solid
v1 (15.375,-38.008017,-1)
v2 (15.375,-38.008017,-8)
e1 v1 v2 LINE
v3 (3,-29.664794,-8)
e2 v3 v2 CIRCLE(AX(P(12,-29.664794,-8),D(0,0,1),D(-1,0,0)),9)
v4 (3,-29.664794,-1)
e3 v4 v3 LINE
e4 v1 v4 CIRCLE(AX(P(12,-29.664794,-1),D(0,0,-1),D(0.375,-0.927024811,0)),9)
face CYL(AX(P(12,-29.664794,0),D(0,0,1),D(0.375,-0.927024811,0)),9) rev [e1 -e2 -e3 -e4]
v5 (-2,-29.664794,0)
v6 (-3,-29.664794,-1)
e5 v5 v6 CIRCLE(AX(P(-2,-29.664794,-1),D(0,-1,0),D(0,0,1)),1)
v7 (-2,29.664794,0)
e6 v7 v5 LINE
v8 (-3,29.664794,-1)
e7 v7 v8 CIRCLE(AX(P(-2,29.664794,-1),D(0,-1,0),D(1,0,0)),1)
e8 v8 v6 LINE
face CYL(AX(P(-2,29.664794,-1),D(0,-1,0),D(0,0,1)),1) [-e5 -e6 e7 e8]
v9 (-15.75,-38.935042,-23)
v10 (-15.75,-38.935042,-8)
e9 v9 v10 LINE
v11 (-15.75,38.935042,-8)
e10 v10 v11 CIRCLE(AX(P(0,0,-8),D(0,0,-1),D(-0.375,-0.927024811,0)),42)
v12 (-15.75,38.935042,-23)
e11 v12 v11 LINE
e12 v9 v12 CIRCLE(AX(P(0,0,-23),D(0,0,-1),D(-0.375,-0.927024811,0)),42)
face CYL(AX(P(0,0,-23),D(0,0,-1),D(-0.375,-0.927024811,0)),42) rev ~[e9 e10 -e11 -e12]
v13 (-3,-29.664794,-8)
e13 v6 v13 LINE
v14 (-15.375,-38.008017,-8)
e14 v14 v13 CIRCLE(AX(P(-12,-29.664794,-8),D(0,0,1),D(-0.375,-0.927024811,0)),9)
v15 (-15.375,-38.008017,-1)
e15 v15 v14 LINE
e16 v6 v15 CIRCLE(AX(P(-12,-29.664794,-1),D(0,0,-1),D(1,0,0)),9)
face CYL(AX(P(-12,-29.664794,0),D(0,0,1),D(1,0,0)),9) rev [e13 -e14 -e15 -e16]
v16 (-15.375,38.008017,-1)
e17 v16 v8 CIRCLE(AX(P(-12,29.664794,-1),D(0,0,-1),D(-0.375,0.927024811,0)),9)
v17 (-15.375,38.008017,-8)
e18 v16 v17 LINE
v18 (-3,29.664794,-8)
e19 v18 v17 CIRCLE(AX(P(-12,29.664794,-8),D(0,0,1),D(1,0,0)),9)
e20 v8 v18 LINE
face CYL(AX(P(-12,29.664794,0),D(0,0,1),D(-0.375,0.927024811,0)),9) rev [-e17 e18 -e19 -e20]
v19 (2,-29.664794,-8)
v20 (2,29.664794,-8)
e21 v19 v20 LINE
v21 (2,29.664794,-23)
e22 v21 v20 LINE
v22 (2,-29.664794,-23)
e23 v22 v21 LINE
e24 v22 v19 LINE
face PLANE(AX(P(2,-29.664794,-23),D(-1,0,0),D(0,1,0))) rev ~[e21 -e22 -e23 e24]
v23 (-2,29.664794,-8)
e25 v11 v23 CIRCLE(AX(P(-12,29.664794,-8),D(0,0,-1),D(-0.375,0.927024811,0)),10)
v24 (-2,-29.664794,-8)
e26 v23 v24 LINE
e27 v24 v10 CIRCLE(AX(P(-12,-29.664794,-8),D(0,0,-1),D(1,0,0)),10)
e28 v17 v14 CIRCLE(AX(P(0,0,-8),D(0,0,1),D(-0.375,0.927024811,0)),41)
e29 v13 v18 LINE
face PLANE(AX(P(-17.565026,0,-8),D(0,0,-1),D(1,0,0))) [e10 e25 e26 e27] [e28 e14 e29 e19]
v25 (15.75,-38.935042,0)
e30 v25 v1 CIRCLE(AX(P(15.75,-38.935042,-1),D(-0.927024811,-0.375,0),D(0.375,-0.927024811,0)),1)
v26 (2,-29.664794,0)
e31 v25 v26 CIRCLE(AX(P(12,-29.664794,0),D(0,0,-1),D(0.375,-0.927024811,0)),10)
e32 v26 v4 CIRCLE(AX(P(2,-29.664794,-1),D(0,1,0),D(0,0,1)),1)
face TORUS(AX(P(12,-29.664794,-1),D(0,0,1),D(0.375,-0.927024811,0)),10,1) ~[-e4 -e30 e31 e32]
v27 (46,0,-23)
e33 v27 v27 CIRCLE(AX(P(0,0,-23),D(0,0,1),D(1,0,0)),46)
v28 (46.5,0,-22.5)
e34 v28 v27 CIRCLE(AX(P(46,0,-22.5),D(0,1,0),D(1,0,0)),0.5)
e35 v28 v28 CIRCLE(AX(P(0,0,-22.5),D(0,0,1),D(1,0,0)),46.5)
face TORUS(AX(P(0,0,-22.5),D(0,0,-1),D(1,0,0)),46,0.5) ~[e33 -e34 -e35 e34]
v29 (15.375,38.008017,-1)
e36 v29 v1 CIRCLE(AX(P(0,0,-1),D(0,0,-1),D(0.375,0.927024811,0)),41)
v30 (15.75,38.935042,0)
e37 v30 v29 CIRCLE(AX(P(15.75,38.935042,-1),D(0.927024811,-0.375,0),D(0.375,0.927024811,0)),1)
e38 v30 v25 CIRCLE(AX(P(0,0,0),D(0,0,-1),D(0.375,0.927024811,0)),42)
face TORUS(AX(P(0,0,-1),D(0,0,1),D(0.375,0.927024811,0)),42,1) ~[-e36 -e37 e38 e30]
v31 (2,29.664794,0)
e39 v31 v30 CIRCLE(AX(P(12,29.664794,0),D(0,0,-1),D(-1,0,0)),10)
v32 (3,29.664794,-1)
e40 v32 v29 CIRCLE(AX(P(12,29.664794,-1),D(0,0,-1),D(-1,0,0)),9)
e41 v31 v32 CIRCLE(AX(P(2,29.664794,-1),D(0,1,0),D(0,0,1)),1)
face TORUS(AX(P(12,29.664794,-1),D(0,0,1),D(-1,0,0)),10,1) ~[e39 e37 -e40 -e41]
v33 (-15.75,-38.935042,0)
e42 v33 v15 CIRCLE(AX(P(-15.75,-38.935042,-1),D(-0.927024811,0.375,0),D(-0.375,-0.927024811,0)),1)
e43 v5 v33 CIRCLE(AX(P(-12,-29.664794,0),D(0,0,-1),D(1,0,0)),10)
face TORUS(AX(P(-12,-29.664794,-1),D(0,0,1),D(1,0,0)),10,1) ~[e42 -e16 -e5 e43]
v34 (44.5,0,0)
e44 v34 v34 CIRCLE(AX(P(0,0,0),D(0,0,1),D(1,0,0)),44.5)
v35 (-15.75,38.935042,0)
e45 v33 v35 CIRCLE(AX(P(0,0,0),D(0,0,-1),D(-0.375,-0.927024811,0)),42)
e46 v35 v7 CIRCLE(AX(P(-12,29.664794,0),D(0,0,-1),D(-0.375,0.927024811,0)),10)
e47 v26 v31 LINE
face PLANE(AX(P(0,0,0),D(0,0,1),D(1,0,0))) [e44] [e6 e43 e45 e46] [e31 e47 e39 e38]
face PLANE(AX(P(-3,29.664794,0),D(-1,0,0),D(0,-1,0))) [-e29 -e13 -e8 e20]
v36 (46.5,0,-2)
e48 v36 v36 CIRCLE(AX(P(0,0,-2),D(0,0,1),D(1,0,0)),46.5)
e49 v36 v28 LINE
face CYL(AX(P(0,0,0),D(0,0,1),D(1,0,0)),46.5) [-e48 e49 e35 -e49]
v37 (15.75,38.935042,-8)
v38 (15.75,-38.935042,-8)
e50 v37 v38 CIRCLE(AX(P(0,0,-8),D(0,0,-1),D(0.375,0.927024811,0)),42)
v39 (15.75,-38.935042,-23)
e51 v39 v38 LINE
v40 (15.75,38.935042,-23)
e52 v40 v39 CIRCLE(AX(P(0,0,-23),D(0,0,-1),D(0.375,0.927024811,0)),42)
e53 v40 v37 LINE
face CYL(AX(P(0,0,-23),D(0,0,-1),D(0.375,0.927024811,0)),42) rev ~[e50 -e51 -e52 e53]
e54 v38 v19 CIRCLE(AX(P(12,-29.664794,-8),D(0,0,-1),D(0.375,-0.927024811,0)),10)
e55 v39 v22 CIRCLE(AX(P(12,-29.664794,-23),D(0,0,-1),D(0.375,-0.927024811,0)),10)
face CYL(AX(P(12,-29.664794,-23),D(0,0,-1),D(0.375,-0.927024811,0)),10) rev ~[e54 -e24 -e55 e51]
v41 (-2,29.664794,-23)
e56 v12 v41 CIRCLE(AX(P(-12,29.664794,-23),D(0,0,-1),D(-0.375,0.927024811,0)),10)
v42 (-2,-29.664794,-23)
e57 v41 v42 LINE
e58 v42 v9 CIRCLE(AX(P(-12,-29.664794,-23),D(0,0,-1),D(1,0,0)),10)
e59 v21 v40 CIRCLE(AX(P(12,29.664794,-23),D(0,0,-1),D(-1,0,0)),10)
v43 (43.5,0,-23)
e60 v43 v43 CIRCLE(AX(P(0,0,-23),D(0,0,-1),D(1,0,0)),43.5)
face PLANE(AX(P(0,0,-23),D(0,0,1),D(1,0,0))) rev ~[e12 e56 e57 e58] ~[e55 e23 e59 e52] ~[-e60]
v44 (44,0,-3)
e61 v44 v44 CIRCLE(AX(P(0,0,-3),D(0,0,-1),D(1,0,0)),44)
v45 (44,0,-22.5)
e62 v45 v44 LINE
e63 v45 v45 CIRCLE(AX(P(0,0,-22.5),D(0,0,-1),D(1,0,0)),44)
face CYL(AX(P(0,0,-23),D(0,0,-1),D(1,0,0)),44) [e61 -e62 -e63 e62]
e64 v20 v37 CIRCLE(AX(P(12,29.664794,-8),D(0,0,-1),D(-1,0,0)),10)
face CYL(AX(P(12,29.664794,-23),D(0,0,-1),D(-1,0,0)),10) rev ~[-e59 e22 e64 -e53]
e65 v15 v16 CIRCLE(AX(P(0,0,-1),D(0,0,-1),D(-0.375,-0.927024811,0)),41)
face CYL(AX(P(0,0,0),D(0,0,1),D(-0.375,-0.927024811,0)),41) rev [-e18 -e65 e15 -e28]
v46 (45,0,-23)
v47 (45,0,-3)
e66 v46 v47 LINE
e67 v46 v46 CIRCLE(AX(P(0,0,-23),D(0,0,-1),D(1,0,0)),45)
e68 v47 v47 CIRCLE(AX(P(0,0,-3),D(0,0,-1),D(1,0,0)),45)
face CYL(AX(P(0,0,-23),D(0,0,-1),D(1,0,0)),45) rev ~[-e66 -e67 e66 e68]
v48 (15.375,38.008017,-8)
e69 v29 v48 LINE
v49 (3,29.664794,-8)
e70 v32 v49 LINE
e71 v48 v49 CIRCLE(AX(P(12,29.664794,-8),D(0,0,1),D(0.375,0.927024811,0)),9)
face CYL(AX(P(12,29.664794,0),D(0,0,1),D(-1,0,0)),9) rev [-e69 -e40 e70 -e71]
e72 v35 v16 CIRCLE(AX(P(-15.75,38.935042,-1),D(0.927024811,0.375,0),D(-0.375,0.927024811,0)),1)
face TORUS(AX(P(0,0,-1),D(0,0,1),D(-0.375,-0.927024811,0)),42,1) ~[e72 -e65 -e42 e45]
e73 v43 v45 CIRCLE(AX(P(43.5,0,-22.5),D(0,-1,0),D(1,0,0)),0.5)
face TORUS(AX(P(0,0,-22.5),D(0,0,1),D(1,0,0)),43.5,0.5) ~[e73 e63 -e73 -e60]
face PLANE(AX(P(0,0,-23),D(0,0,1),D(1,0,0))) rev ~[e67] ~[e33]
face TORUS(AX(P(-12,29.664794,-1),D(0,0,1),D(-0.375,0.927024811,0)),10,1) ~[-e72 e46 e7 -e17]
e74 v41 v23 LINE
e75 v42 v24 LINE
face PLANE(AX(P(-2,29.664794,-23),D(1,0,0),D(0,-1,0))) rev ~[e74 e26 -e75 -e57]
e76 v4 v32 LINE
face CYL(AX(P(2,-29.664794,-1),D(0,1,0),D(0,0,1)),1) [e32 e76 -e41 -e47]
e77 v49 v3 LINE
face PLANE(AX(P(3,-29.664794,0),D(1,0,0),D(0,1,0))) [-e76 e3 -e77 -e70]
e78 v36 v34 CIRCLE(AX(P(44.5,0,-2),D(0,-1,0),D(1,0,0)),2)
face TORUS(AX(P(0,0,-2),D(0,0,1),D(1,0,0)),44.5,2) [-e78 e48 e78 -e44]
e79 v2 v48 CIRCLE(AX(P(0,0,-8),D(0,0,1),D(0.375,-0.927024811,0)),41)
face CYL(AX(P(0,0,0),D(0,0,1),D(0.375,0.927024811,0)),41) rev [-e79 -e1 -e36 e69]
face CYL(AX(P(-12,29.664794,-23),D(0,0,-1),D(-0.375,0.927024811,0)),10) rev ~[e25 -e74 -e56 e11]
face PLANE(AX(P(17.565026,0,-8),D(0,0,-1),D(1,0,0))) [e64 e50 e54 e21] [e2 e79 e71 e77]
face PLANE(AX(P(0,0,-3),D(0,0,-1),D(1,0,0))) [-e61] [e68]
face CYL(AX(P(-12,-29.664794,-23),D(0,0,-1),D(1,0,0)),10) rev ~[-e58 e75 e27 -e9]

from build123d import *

# Parameters (mm, degrees)
F0_R     = 46.5
F1_DEPTH = 23
F3_DEPTH = 15
F4_R     = 1
F5_R     = 45
F5_R_2   = 44
F6_DEPTH = 20
F7_R     = 0.5
F8_R     = 2


# Not quite as in the source:
# - a feature names something its author has since deleted; it is built from what else it names


with BuildPart() as f1:
    # F0 (on Top) → F1 (new body)
    with BuildSketch(Plane.XY):
        Circle(F0_R)
        with BuildLine():
            ThreePointArc((-15.375, -38.0080172464), (-41, 0), (-15.375, 38.0080172464))
            ThreePointArc((-15.375, 38.0080172464), (-6.9688470506, 37.1271997267), (-3, 29.6647939484))
            Line((-3, 29.6647939484), (-3, -29.6647939484))
            ThreePointArc((-3, -29.6647939484), (-6.9688470506, -37.1271997267), (-15.375, -38.0080172464))
        make_face(mode=Mode.SUBTRACT)
        with BuildLine():
            Line((3, -29.6647939484), (3, 29.6647939484))
            ThreePointArc((3, 29.6647939484), (6.9688470506, 37.1271997267), (15.375, 38.0080172464))
            ThreePointArc((15.375, 38.0080172464), (41, 0), (15.375, -38.0080172464))
            ThreePointArc((15.375, -38.0080172464), (6.9688470506, -37.1271997267), (3, -29.6647939484))
        make_face(mode=Mode.SUBTRACT)
    extrude(amount=-F1_DEPTH)

    # F2 (on face) → F3 (cut)
    with BuildSketch(Plane(origin=(0, 0, -23), x_dir=(1, 0, 0), z_dir=(0, 0, -1))):
        with BuildLine():
            ThreePointArc((-15.75, -38.9350420573), (-6.4098300563, -37.9563559243), (-2, -29.6647939484))
            Line((-2, -29.6647939484), (-2, 29.6647939484))
            ThreePointArc((-2, 29.6647939484), (-6.4098300563, 37.9563559243), (-15.75, 38.9350420573))
            ThreePointArc((-15.75, 38.9350420573), (-42, 0), (-15.75, -38.9350420573))
        make_face()
        with BuildLine():
            Line((-3, 29.6647939484), (-3, -29.6647939484))
            ThreePointArc((-3, -29.6647939484), (-6.9688470506, -37.1271997267), (-15.375, -38.0080172464))
            ThreePointArc((-15.375, -38.0080172464), (-41, 0), (-15.375, 38.0080172464))
            ThreePointArc((-15.375, 38.0080172464), (-6.9688470506, 37.1271997267), (-3, 29.6647939484))
        make_face(mode=Mode.SUBTRACT)
        with BuildLine():
            ThreePointArc((2, -29.6647939484), (6.4098300563, -37.9563559243), (15.75, -38.9350420573))
            ThreePointArc((15.75, -38.9350420573), (42, 0), (15.75, 38.9350420573))
            ThreePointArc((15.75, 38.9350420573), (6.4098300563, 37.9563559243), (2, 29.6647939484))
            Line((2, 29.6647939484), (2, -29.6647939484))
        make_face()
        with BuildLine():
            ThreePointArc((3, 29.6647939484), (6.9688470506, 37.1271997267), (15.375, 38.0080172464))
            ThreePointArc((15.375, 38.0080172464), (41, 0), (15.375, -38.0080172464))
            ThreePointArc((15.375, -38.0080172464), (6.9688470506, -37.1271997267), (3, -29.6647939484))
            Line((3, -29.6647939484), (3, 29.6647939484))
        make_face(mode=Mode.SUBTRACT)
    extrude(amount=-F3_DEPTH, mode=Mode.SUBTRACT)

    # F4
    f4_edges = [f1.edges().sort_by_distance(p)[0] for p in [
        (-41, 0, 0),
        (3, 0, 0),
    ]]
    fillet(f4_edges, radius=F4_R)

    # F5 (on face) → F6 (cut)
    with BuildSketch(Plane(origin=(0, 0, -23), x_dir=(1, 0, 0), z_dir=(0, 0, -1))):
        Circle(F5_R)
        Circle(F5_R_2, mode=Mode.SUBTRACT)
    extrude(amount=-F6_DEPTH, mode=Mode.SUBTRACT)

    # F7
    f7_edges = [f1.edges().sort_by_distance(p)[0] for p in [
        (-44, 0, -23),
        (-46.5, 0, -23),
    ]]
    fillet(f7_edges, radius=F7_R)

    # F8
    f8_edges = [f1.edges().sort_by_distance(p)[0] for p in [
        (-46.5, 0, 0),
    ]]
    fillet(f8_edges, radius=F8_R)


solid = f1.part
